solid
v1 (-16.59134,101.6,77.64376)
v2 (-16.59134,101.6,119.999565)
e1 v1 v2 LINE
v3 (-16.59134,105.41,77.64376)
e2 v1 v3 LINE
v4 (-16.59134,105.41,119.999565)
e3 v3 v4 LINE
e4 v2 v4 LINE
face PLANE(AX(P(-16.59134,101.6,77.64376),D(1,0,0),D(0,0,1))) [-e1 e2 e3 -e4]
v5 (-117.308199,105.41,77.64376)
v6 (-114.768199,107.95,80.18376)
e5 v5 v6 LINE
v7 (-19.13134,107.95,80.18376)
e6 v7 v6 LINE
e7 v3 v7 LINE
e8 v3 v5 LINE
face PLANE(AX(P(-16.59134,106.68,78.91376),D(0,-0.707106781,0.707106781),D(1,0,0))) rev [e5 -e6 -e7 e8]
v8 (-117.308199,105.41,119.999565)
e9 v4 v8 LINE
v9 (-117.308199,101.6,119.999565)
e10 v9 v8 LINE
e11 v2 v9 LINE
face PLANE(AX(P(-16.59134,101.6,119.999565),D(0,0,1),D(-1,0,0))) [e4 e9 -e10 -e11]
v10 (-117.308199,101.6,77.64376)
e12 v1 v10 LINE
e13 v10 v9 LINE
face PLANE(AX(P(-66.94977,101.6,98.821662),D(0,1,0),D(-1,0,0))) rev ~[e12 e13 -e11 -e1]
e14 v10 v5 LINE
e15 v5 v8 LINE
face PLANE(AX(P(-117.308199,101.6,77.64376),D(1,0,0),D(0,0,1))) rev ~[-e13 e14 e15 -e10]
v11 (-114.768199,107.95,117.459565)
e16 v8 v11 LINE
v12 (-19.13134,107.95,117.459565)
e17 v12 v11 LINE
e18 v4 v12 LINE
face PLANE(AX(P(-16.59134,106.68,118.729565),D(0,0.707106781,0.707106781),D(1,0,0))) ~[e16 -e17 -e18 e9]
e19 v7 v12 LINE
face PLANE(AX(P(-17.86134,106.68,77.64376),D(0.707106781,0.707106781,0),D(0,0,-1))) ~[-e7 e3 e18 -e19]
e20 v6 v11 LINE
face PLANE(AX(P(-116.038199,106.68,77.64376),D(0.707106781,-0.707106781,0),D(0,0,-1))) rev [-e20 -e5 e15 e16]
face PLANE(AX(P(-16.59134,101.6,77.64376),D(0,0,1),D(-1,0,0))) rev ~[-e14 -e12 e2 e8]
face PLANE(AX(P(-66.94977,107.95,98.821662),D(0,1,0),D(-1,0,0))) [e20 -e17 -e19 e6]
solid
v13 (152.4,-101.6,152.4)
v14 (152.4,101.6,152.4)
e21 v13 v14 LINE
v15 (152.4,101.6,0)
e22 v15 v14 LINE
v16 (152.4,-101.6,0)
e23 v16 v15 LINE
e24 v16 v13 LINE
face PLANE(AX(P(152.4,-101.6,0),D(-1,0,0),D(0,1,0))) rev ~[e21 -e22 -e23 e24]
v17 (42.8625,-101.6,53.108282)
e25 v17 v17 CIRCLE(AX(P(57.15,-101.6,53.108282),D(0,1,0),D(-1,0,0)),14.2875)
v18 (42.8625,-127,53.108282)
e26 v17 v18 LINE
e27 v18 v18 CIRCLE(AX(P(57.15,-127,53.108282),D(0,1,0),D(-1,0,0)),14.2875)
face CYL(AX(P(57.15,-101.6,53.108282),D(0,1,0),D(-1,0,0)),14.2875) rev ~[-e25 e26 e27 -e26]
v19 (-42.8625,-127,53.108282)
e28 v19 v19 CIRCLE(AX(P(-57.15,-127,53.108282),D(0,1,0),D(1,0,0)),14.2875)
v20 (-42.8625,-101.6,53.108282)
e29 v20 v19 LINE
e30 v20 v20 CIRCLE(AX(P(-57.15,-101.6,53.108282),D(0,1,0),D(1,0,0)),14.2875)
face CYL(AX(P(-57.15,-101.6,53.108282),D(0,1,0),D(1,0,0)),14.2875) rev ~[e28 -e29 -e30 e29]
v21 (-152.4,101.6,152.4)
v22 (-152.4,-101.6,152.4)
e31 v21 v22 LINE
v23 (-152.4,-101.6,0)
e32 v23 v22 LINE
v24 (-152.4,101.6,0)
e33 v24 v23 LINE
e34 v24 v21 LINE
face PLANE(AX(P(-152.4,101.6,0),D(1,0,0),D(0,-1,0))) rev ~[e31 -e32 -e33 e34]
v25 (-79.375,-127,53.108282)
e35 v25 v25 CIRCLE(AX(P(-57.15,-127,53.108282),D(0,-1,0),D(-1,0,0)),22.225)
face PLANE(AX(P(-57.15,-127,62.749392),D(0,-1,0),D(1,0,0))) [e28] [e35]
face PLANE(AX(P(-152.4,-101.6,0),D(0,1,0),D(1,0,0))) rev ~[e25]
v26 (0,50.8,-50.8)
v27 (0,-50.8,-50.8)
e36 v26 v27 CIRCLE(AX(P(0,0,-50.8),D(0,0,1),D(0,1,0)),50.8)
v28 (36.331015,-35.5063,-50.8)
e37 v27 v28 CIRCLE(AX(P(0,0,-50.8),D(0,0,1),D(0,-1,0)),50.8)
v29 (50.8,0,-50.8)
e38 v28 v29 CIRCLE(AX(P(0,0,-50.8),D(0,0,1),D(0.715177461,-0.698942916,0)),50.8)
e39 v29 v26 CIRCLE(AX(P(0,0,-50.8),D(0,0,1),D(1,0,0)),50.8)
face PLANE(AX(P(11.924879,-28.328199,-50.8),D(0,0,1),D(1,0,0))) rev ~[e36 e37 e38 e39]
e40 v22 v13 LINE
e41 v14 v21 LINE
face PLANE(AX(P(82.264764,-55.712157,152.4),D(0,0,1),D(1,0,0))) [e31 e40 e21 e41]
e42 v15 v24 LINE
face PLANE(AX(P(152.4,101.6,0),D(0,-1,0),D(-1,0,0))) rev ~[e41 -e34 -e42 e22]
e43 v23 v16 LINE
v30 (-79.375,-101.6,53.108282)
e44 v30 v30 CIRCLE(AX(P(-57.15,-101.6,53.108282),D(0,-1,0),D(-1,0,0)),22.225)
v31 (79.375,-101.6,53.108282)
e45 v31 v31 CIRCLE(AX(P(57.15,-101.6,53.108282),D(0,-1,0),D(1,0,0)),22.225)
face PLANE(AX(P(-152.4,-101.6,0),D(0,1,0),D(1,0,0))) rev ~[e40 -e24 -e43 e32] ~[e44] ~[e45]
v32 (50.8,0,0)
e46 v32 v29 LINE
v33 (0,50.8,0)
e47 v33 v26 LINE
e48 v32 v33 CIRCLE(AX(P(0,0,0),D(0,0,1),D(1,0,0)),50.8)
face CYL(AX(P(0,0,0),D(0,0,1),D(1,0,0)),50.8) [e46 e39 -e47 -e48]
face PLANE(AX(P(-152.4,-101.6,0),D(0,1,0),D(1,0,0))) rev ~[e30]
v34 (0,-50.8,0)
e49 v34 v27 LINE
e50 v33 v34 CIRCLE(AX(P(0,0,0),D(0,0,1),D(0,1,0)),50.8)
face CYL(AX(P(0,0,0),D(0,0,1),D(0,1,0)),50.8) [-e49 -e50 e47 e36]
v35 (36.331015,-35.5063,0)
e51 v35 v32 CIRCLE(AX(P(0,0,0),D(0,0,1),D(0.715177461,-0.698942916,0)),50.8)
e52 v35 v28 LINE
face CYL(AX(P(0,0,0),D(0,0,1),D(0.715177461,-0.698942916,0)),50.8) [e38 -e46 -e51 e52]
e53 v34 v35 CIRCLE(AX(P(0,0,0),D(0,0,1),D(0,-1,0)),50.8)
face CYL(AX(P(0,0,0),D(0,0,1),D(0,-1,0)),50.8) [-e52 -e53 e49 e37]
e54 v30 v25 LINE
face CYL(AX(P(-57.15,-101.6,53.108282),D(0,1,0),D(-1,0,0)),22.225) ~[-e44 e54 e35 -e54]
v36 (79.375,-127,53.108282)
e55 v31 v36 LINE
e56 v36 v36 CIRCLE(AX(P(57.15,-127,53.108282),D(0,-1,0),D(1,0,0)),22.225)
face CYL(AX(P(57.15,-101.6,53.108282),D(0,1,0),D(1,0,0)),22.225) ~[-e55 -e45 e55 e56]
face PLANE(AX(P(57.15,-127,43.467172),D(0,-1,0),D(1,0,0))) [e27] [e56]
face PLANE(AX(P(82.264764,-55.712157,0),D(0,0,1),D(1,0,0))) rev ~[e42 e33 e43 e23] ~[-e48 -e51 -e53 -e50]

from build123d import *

# Parameters (mm, degrees)
F1_DEPTH = 152.4
F2_DEPTH = 50.8
F4_DEPTH = 25.4
F5_W     = 100.7168591022
F5_H     = 42.3558056355
F6_DEPTH = 6.35
F7_SIZE  = 2.54


with BuildPart() as f1:
    # F0 (on Top) → F1 (new body)
    with BuildSketch(Plane.XY):
        with BuildLine():
            Line((152.4, 0), (50.8, 0))
            ThreePointArc((50.8, 0), (47.0438920676, -19.1706082098), (36.3310149947, -35.5063001375))
            ThreePointArc((36.3310149947, -35.5063001375), (19.7093880297, -46.820722159), (0, -50.8))
            Line((0, -50.8), (0, -101.6))
            Line((0, -101.6), (152.4, -101.6))
            Line((152.4, -101.6), (152.4, 0))
        make_face()
        with BuildLine():
            ThreePointArc((0, 50.8), (35.9210244843, 35.9210244843), (50.8, 0))
            Line((50.8, 0), (152.4, 0))
            Line((152.4, 0), (152.4, 101.6))
            Line((152.4, 101.6), (0, 101.6))
            Line((0, 101.6), (0, 50.8))
        make_face()
        with BuildLine():
            ThreePointArc((0, -50.8), (-50.8, 0), (0, 50.8))
            Line((0, 50.8), (0, 101.6))
            Line((0, 101.6), (-152.4, 101.6))
            Line((-152.4, 101.6), (-152.4, -101.6))
            Line((-152.4, -101.6), (0, -101.6))
            Line((0, -101.6), (0, -50.8))
        make_face()
        with BuildLine():
            Line((0, -50.8), (0, 0))
            Line((0, 0), (0, 50.8))
            ThreePointArc((0, 50.8), (-50.8, 0), (0, -50.8))
        make_face()
        with BuildLine():
            Line((0, 50.8), (0, 0))
            Line((0, 0), (50.8, 0))
            ThreePointArc((50.8, 0), (35.9210244843, 35.9210244843), (0, 50.8))
        make_face()
        with BuildLine():
            Line((36.3310149947, -35.5063001375), (0, 0))
            Line((0, 0), (0, -50.8))
            ThreePointArc((0, -50.8), (19.7093880297, -46.820722159), (36.3310149947, -35.5063001375))
        make_face()
        with BuildLine():
            Line((50.8, 0), (0, 0))
            Line((0, 0), (36.3310149947, -35.5063001375))
            ThreePointArc((36.3310149947, -35.5063001375), (47.0438920676, -19.1706082098), (50.8, 0))
        make_face()
    extrude(amount=F1_DEPTH)

    # F0 (on Top) → F2 (join)
    with BuildSketch(Plane.XY):
        with BuildLine():
            Line((36.3310149947, -35.5063001375), (0, 0))
            Line((0, 0), (0, -50.8))
            ThreePointArc((0, -50.8), (19.7093880297, -46.820722159), (36.3310149947, -35.5063001375))
        make_face()
        with BuildLine():
            Line((50.8, 0), (0, 0))
            Line((0, 0), (36.3310149947, -35.5063001375))
            ThreePointArc((36.3310149947, -35.5063001375), (47.0438920676, -19.1706082098), (50.8, 0))
        make_face()
        with BuildLine():
            Line((0, 50.8), (0, 0))
            Line((0, 0), (50.8, 0))
            ThreePointArc((50.8, 0), (35.9210244843, 35.9210244843), (0, 50.8))
        make_face()
        with BuildLine():
            Line((0, -50.8), (0, 0))
            Line((0, 0), (0, 50.8))
            ThreePointArc((0, 50.8), (-50.8, 0), (0, -50.8))
        make_face()
    extrude(amount=-F2_DEPTH)

    # F3 (on face) → F4 (join)
    with BuildSketch(Plane.XZ.offset(101.6)):
        with BuildLine():
            ThreePointArc((34.925, 53.1082823873), (57.15, 30.8832823873), (79.375, 53.1082823873))
            Line((79.375, 53.1082823873), (71.4375, 53.1082823873))
            ThreePointArc((71.4375, 53.1082823873), (57.15, 38.8207823873), (42.8625, 53.1082823873))
            Line((42.8625, 53.1082823873), (34.925, 53.1082823873))
        make_face()
        with BuildLine():
            Line((71.4375, 53.1082823873), (79.375, 53.1082823873))
            ThreePointArc((79.375, 53.1082823873), (57.15, 75.3332823873), (34.925, 53.1082823873))
            Line((34.925, 53.1082823873), (42.8625, 53.1082823873))
            ThreePointArc((42.8625, 53.1082823873), (57.15, 67.3957823873), (71.4375, 53.1082823873))
        make_face()
        with BuildLine():
            ThreePointArc((-34.925, 53.1082823873), (-57.15, 75.3332823873), (-79.375, 53.1082823873))
            Line((-79.375, 53.1082823873), (-71.4375, 53.1082823873))
            ThreePointArc((-71.4375, 53.1082823873), (-57.15, 67.3957823873), (-42.8625, 53.1082823873))
            Line((-42.8625, 53.1082823873), (-34.925, 53.1082823873))
        make_face()
        with BuildLine():
            Line((-71.4375, 53.1082823873), (-79.375, 53.1082823873))
            ThreePointArc((-79.375, 53.1082823873), (-57.15, 30.8832823873), (-34.925, 53.1082823873))
            Line((-34.925, 53.1082823873), (-42.8625, 53.1082823873))
            ThreePointArc((-42.8625, 53.1082823873), (-57.15, 38.8207823873), (-71.4375, 53.1082823873))
        make_face()
    extrude(amount=F4_DEPTH)


with BuildPart() as f6:
    # F5 (on face) → F6 (new body)
    with BuildSketch(Plane(origin=(0, 101.6, 0), x_dir=(-1, 0, 0), z_dir=(0, 1, 0))):
        with Locations((66.9497698545, 98.8216623664)):
            Rectangle(F5_W, F5_H)
    extrude(amount=F6_DEPTH)

    # F7
    f7_edges = [f6.edges().sort_by_distance(p)[0] for p in [
        (-66.94977, 107.95, 119.999565),
        (-117.308199, 107.95, 98.821662),
        (-16.59134, 107.95, 98.821662),
        (-66.94977, 107.95, 77.64376),
    ]]
    chamfer(f7_edges, length=F7_SIZE)


solid = Compound([f1.part, f6.part])
